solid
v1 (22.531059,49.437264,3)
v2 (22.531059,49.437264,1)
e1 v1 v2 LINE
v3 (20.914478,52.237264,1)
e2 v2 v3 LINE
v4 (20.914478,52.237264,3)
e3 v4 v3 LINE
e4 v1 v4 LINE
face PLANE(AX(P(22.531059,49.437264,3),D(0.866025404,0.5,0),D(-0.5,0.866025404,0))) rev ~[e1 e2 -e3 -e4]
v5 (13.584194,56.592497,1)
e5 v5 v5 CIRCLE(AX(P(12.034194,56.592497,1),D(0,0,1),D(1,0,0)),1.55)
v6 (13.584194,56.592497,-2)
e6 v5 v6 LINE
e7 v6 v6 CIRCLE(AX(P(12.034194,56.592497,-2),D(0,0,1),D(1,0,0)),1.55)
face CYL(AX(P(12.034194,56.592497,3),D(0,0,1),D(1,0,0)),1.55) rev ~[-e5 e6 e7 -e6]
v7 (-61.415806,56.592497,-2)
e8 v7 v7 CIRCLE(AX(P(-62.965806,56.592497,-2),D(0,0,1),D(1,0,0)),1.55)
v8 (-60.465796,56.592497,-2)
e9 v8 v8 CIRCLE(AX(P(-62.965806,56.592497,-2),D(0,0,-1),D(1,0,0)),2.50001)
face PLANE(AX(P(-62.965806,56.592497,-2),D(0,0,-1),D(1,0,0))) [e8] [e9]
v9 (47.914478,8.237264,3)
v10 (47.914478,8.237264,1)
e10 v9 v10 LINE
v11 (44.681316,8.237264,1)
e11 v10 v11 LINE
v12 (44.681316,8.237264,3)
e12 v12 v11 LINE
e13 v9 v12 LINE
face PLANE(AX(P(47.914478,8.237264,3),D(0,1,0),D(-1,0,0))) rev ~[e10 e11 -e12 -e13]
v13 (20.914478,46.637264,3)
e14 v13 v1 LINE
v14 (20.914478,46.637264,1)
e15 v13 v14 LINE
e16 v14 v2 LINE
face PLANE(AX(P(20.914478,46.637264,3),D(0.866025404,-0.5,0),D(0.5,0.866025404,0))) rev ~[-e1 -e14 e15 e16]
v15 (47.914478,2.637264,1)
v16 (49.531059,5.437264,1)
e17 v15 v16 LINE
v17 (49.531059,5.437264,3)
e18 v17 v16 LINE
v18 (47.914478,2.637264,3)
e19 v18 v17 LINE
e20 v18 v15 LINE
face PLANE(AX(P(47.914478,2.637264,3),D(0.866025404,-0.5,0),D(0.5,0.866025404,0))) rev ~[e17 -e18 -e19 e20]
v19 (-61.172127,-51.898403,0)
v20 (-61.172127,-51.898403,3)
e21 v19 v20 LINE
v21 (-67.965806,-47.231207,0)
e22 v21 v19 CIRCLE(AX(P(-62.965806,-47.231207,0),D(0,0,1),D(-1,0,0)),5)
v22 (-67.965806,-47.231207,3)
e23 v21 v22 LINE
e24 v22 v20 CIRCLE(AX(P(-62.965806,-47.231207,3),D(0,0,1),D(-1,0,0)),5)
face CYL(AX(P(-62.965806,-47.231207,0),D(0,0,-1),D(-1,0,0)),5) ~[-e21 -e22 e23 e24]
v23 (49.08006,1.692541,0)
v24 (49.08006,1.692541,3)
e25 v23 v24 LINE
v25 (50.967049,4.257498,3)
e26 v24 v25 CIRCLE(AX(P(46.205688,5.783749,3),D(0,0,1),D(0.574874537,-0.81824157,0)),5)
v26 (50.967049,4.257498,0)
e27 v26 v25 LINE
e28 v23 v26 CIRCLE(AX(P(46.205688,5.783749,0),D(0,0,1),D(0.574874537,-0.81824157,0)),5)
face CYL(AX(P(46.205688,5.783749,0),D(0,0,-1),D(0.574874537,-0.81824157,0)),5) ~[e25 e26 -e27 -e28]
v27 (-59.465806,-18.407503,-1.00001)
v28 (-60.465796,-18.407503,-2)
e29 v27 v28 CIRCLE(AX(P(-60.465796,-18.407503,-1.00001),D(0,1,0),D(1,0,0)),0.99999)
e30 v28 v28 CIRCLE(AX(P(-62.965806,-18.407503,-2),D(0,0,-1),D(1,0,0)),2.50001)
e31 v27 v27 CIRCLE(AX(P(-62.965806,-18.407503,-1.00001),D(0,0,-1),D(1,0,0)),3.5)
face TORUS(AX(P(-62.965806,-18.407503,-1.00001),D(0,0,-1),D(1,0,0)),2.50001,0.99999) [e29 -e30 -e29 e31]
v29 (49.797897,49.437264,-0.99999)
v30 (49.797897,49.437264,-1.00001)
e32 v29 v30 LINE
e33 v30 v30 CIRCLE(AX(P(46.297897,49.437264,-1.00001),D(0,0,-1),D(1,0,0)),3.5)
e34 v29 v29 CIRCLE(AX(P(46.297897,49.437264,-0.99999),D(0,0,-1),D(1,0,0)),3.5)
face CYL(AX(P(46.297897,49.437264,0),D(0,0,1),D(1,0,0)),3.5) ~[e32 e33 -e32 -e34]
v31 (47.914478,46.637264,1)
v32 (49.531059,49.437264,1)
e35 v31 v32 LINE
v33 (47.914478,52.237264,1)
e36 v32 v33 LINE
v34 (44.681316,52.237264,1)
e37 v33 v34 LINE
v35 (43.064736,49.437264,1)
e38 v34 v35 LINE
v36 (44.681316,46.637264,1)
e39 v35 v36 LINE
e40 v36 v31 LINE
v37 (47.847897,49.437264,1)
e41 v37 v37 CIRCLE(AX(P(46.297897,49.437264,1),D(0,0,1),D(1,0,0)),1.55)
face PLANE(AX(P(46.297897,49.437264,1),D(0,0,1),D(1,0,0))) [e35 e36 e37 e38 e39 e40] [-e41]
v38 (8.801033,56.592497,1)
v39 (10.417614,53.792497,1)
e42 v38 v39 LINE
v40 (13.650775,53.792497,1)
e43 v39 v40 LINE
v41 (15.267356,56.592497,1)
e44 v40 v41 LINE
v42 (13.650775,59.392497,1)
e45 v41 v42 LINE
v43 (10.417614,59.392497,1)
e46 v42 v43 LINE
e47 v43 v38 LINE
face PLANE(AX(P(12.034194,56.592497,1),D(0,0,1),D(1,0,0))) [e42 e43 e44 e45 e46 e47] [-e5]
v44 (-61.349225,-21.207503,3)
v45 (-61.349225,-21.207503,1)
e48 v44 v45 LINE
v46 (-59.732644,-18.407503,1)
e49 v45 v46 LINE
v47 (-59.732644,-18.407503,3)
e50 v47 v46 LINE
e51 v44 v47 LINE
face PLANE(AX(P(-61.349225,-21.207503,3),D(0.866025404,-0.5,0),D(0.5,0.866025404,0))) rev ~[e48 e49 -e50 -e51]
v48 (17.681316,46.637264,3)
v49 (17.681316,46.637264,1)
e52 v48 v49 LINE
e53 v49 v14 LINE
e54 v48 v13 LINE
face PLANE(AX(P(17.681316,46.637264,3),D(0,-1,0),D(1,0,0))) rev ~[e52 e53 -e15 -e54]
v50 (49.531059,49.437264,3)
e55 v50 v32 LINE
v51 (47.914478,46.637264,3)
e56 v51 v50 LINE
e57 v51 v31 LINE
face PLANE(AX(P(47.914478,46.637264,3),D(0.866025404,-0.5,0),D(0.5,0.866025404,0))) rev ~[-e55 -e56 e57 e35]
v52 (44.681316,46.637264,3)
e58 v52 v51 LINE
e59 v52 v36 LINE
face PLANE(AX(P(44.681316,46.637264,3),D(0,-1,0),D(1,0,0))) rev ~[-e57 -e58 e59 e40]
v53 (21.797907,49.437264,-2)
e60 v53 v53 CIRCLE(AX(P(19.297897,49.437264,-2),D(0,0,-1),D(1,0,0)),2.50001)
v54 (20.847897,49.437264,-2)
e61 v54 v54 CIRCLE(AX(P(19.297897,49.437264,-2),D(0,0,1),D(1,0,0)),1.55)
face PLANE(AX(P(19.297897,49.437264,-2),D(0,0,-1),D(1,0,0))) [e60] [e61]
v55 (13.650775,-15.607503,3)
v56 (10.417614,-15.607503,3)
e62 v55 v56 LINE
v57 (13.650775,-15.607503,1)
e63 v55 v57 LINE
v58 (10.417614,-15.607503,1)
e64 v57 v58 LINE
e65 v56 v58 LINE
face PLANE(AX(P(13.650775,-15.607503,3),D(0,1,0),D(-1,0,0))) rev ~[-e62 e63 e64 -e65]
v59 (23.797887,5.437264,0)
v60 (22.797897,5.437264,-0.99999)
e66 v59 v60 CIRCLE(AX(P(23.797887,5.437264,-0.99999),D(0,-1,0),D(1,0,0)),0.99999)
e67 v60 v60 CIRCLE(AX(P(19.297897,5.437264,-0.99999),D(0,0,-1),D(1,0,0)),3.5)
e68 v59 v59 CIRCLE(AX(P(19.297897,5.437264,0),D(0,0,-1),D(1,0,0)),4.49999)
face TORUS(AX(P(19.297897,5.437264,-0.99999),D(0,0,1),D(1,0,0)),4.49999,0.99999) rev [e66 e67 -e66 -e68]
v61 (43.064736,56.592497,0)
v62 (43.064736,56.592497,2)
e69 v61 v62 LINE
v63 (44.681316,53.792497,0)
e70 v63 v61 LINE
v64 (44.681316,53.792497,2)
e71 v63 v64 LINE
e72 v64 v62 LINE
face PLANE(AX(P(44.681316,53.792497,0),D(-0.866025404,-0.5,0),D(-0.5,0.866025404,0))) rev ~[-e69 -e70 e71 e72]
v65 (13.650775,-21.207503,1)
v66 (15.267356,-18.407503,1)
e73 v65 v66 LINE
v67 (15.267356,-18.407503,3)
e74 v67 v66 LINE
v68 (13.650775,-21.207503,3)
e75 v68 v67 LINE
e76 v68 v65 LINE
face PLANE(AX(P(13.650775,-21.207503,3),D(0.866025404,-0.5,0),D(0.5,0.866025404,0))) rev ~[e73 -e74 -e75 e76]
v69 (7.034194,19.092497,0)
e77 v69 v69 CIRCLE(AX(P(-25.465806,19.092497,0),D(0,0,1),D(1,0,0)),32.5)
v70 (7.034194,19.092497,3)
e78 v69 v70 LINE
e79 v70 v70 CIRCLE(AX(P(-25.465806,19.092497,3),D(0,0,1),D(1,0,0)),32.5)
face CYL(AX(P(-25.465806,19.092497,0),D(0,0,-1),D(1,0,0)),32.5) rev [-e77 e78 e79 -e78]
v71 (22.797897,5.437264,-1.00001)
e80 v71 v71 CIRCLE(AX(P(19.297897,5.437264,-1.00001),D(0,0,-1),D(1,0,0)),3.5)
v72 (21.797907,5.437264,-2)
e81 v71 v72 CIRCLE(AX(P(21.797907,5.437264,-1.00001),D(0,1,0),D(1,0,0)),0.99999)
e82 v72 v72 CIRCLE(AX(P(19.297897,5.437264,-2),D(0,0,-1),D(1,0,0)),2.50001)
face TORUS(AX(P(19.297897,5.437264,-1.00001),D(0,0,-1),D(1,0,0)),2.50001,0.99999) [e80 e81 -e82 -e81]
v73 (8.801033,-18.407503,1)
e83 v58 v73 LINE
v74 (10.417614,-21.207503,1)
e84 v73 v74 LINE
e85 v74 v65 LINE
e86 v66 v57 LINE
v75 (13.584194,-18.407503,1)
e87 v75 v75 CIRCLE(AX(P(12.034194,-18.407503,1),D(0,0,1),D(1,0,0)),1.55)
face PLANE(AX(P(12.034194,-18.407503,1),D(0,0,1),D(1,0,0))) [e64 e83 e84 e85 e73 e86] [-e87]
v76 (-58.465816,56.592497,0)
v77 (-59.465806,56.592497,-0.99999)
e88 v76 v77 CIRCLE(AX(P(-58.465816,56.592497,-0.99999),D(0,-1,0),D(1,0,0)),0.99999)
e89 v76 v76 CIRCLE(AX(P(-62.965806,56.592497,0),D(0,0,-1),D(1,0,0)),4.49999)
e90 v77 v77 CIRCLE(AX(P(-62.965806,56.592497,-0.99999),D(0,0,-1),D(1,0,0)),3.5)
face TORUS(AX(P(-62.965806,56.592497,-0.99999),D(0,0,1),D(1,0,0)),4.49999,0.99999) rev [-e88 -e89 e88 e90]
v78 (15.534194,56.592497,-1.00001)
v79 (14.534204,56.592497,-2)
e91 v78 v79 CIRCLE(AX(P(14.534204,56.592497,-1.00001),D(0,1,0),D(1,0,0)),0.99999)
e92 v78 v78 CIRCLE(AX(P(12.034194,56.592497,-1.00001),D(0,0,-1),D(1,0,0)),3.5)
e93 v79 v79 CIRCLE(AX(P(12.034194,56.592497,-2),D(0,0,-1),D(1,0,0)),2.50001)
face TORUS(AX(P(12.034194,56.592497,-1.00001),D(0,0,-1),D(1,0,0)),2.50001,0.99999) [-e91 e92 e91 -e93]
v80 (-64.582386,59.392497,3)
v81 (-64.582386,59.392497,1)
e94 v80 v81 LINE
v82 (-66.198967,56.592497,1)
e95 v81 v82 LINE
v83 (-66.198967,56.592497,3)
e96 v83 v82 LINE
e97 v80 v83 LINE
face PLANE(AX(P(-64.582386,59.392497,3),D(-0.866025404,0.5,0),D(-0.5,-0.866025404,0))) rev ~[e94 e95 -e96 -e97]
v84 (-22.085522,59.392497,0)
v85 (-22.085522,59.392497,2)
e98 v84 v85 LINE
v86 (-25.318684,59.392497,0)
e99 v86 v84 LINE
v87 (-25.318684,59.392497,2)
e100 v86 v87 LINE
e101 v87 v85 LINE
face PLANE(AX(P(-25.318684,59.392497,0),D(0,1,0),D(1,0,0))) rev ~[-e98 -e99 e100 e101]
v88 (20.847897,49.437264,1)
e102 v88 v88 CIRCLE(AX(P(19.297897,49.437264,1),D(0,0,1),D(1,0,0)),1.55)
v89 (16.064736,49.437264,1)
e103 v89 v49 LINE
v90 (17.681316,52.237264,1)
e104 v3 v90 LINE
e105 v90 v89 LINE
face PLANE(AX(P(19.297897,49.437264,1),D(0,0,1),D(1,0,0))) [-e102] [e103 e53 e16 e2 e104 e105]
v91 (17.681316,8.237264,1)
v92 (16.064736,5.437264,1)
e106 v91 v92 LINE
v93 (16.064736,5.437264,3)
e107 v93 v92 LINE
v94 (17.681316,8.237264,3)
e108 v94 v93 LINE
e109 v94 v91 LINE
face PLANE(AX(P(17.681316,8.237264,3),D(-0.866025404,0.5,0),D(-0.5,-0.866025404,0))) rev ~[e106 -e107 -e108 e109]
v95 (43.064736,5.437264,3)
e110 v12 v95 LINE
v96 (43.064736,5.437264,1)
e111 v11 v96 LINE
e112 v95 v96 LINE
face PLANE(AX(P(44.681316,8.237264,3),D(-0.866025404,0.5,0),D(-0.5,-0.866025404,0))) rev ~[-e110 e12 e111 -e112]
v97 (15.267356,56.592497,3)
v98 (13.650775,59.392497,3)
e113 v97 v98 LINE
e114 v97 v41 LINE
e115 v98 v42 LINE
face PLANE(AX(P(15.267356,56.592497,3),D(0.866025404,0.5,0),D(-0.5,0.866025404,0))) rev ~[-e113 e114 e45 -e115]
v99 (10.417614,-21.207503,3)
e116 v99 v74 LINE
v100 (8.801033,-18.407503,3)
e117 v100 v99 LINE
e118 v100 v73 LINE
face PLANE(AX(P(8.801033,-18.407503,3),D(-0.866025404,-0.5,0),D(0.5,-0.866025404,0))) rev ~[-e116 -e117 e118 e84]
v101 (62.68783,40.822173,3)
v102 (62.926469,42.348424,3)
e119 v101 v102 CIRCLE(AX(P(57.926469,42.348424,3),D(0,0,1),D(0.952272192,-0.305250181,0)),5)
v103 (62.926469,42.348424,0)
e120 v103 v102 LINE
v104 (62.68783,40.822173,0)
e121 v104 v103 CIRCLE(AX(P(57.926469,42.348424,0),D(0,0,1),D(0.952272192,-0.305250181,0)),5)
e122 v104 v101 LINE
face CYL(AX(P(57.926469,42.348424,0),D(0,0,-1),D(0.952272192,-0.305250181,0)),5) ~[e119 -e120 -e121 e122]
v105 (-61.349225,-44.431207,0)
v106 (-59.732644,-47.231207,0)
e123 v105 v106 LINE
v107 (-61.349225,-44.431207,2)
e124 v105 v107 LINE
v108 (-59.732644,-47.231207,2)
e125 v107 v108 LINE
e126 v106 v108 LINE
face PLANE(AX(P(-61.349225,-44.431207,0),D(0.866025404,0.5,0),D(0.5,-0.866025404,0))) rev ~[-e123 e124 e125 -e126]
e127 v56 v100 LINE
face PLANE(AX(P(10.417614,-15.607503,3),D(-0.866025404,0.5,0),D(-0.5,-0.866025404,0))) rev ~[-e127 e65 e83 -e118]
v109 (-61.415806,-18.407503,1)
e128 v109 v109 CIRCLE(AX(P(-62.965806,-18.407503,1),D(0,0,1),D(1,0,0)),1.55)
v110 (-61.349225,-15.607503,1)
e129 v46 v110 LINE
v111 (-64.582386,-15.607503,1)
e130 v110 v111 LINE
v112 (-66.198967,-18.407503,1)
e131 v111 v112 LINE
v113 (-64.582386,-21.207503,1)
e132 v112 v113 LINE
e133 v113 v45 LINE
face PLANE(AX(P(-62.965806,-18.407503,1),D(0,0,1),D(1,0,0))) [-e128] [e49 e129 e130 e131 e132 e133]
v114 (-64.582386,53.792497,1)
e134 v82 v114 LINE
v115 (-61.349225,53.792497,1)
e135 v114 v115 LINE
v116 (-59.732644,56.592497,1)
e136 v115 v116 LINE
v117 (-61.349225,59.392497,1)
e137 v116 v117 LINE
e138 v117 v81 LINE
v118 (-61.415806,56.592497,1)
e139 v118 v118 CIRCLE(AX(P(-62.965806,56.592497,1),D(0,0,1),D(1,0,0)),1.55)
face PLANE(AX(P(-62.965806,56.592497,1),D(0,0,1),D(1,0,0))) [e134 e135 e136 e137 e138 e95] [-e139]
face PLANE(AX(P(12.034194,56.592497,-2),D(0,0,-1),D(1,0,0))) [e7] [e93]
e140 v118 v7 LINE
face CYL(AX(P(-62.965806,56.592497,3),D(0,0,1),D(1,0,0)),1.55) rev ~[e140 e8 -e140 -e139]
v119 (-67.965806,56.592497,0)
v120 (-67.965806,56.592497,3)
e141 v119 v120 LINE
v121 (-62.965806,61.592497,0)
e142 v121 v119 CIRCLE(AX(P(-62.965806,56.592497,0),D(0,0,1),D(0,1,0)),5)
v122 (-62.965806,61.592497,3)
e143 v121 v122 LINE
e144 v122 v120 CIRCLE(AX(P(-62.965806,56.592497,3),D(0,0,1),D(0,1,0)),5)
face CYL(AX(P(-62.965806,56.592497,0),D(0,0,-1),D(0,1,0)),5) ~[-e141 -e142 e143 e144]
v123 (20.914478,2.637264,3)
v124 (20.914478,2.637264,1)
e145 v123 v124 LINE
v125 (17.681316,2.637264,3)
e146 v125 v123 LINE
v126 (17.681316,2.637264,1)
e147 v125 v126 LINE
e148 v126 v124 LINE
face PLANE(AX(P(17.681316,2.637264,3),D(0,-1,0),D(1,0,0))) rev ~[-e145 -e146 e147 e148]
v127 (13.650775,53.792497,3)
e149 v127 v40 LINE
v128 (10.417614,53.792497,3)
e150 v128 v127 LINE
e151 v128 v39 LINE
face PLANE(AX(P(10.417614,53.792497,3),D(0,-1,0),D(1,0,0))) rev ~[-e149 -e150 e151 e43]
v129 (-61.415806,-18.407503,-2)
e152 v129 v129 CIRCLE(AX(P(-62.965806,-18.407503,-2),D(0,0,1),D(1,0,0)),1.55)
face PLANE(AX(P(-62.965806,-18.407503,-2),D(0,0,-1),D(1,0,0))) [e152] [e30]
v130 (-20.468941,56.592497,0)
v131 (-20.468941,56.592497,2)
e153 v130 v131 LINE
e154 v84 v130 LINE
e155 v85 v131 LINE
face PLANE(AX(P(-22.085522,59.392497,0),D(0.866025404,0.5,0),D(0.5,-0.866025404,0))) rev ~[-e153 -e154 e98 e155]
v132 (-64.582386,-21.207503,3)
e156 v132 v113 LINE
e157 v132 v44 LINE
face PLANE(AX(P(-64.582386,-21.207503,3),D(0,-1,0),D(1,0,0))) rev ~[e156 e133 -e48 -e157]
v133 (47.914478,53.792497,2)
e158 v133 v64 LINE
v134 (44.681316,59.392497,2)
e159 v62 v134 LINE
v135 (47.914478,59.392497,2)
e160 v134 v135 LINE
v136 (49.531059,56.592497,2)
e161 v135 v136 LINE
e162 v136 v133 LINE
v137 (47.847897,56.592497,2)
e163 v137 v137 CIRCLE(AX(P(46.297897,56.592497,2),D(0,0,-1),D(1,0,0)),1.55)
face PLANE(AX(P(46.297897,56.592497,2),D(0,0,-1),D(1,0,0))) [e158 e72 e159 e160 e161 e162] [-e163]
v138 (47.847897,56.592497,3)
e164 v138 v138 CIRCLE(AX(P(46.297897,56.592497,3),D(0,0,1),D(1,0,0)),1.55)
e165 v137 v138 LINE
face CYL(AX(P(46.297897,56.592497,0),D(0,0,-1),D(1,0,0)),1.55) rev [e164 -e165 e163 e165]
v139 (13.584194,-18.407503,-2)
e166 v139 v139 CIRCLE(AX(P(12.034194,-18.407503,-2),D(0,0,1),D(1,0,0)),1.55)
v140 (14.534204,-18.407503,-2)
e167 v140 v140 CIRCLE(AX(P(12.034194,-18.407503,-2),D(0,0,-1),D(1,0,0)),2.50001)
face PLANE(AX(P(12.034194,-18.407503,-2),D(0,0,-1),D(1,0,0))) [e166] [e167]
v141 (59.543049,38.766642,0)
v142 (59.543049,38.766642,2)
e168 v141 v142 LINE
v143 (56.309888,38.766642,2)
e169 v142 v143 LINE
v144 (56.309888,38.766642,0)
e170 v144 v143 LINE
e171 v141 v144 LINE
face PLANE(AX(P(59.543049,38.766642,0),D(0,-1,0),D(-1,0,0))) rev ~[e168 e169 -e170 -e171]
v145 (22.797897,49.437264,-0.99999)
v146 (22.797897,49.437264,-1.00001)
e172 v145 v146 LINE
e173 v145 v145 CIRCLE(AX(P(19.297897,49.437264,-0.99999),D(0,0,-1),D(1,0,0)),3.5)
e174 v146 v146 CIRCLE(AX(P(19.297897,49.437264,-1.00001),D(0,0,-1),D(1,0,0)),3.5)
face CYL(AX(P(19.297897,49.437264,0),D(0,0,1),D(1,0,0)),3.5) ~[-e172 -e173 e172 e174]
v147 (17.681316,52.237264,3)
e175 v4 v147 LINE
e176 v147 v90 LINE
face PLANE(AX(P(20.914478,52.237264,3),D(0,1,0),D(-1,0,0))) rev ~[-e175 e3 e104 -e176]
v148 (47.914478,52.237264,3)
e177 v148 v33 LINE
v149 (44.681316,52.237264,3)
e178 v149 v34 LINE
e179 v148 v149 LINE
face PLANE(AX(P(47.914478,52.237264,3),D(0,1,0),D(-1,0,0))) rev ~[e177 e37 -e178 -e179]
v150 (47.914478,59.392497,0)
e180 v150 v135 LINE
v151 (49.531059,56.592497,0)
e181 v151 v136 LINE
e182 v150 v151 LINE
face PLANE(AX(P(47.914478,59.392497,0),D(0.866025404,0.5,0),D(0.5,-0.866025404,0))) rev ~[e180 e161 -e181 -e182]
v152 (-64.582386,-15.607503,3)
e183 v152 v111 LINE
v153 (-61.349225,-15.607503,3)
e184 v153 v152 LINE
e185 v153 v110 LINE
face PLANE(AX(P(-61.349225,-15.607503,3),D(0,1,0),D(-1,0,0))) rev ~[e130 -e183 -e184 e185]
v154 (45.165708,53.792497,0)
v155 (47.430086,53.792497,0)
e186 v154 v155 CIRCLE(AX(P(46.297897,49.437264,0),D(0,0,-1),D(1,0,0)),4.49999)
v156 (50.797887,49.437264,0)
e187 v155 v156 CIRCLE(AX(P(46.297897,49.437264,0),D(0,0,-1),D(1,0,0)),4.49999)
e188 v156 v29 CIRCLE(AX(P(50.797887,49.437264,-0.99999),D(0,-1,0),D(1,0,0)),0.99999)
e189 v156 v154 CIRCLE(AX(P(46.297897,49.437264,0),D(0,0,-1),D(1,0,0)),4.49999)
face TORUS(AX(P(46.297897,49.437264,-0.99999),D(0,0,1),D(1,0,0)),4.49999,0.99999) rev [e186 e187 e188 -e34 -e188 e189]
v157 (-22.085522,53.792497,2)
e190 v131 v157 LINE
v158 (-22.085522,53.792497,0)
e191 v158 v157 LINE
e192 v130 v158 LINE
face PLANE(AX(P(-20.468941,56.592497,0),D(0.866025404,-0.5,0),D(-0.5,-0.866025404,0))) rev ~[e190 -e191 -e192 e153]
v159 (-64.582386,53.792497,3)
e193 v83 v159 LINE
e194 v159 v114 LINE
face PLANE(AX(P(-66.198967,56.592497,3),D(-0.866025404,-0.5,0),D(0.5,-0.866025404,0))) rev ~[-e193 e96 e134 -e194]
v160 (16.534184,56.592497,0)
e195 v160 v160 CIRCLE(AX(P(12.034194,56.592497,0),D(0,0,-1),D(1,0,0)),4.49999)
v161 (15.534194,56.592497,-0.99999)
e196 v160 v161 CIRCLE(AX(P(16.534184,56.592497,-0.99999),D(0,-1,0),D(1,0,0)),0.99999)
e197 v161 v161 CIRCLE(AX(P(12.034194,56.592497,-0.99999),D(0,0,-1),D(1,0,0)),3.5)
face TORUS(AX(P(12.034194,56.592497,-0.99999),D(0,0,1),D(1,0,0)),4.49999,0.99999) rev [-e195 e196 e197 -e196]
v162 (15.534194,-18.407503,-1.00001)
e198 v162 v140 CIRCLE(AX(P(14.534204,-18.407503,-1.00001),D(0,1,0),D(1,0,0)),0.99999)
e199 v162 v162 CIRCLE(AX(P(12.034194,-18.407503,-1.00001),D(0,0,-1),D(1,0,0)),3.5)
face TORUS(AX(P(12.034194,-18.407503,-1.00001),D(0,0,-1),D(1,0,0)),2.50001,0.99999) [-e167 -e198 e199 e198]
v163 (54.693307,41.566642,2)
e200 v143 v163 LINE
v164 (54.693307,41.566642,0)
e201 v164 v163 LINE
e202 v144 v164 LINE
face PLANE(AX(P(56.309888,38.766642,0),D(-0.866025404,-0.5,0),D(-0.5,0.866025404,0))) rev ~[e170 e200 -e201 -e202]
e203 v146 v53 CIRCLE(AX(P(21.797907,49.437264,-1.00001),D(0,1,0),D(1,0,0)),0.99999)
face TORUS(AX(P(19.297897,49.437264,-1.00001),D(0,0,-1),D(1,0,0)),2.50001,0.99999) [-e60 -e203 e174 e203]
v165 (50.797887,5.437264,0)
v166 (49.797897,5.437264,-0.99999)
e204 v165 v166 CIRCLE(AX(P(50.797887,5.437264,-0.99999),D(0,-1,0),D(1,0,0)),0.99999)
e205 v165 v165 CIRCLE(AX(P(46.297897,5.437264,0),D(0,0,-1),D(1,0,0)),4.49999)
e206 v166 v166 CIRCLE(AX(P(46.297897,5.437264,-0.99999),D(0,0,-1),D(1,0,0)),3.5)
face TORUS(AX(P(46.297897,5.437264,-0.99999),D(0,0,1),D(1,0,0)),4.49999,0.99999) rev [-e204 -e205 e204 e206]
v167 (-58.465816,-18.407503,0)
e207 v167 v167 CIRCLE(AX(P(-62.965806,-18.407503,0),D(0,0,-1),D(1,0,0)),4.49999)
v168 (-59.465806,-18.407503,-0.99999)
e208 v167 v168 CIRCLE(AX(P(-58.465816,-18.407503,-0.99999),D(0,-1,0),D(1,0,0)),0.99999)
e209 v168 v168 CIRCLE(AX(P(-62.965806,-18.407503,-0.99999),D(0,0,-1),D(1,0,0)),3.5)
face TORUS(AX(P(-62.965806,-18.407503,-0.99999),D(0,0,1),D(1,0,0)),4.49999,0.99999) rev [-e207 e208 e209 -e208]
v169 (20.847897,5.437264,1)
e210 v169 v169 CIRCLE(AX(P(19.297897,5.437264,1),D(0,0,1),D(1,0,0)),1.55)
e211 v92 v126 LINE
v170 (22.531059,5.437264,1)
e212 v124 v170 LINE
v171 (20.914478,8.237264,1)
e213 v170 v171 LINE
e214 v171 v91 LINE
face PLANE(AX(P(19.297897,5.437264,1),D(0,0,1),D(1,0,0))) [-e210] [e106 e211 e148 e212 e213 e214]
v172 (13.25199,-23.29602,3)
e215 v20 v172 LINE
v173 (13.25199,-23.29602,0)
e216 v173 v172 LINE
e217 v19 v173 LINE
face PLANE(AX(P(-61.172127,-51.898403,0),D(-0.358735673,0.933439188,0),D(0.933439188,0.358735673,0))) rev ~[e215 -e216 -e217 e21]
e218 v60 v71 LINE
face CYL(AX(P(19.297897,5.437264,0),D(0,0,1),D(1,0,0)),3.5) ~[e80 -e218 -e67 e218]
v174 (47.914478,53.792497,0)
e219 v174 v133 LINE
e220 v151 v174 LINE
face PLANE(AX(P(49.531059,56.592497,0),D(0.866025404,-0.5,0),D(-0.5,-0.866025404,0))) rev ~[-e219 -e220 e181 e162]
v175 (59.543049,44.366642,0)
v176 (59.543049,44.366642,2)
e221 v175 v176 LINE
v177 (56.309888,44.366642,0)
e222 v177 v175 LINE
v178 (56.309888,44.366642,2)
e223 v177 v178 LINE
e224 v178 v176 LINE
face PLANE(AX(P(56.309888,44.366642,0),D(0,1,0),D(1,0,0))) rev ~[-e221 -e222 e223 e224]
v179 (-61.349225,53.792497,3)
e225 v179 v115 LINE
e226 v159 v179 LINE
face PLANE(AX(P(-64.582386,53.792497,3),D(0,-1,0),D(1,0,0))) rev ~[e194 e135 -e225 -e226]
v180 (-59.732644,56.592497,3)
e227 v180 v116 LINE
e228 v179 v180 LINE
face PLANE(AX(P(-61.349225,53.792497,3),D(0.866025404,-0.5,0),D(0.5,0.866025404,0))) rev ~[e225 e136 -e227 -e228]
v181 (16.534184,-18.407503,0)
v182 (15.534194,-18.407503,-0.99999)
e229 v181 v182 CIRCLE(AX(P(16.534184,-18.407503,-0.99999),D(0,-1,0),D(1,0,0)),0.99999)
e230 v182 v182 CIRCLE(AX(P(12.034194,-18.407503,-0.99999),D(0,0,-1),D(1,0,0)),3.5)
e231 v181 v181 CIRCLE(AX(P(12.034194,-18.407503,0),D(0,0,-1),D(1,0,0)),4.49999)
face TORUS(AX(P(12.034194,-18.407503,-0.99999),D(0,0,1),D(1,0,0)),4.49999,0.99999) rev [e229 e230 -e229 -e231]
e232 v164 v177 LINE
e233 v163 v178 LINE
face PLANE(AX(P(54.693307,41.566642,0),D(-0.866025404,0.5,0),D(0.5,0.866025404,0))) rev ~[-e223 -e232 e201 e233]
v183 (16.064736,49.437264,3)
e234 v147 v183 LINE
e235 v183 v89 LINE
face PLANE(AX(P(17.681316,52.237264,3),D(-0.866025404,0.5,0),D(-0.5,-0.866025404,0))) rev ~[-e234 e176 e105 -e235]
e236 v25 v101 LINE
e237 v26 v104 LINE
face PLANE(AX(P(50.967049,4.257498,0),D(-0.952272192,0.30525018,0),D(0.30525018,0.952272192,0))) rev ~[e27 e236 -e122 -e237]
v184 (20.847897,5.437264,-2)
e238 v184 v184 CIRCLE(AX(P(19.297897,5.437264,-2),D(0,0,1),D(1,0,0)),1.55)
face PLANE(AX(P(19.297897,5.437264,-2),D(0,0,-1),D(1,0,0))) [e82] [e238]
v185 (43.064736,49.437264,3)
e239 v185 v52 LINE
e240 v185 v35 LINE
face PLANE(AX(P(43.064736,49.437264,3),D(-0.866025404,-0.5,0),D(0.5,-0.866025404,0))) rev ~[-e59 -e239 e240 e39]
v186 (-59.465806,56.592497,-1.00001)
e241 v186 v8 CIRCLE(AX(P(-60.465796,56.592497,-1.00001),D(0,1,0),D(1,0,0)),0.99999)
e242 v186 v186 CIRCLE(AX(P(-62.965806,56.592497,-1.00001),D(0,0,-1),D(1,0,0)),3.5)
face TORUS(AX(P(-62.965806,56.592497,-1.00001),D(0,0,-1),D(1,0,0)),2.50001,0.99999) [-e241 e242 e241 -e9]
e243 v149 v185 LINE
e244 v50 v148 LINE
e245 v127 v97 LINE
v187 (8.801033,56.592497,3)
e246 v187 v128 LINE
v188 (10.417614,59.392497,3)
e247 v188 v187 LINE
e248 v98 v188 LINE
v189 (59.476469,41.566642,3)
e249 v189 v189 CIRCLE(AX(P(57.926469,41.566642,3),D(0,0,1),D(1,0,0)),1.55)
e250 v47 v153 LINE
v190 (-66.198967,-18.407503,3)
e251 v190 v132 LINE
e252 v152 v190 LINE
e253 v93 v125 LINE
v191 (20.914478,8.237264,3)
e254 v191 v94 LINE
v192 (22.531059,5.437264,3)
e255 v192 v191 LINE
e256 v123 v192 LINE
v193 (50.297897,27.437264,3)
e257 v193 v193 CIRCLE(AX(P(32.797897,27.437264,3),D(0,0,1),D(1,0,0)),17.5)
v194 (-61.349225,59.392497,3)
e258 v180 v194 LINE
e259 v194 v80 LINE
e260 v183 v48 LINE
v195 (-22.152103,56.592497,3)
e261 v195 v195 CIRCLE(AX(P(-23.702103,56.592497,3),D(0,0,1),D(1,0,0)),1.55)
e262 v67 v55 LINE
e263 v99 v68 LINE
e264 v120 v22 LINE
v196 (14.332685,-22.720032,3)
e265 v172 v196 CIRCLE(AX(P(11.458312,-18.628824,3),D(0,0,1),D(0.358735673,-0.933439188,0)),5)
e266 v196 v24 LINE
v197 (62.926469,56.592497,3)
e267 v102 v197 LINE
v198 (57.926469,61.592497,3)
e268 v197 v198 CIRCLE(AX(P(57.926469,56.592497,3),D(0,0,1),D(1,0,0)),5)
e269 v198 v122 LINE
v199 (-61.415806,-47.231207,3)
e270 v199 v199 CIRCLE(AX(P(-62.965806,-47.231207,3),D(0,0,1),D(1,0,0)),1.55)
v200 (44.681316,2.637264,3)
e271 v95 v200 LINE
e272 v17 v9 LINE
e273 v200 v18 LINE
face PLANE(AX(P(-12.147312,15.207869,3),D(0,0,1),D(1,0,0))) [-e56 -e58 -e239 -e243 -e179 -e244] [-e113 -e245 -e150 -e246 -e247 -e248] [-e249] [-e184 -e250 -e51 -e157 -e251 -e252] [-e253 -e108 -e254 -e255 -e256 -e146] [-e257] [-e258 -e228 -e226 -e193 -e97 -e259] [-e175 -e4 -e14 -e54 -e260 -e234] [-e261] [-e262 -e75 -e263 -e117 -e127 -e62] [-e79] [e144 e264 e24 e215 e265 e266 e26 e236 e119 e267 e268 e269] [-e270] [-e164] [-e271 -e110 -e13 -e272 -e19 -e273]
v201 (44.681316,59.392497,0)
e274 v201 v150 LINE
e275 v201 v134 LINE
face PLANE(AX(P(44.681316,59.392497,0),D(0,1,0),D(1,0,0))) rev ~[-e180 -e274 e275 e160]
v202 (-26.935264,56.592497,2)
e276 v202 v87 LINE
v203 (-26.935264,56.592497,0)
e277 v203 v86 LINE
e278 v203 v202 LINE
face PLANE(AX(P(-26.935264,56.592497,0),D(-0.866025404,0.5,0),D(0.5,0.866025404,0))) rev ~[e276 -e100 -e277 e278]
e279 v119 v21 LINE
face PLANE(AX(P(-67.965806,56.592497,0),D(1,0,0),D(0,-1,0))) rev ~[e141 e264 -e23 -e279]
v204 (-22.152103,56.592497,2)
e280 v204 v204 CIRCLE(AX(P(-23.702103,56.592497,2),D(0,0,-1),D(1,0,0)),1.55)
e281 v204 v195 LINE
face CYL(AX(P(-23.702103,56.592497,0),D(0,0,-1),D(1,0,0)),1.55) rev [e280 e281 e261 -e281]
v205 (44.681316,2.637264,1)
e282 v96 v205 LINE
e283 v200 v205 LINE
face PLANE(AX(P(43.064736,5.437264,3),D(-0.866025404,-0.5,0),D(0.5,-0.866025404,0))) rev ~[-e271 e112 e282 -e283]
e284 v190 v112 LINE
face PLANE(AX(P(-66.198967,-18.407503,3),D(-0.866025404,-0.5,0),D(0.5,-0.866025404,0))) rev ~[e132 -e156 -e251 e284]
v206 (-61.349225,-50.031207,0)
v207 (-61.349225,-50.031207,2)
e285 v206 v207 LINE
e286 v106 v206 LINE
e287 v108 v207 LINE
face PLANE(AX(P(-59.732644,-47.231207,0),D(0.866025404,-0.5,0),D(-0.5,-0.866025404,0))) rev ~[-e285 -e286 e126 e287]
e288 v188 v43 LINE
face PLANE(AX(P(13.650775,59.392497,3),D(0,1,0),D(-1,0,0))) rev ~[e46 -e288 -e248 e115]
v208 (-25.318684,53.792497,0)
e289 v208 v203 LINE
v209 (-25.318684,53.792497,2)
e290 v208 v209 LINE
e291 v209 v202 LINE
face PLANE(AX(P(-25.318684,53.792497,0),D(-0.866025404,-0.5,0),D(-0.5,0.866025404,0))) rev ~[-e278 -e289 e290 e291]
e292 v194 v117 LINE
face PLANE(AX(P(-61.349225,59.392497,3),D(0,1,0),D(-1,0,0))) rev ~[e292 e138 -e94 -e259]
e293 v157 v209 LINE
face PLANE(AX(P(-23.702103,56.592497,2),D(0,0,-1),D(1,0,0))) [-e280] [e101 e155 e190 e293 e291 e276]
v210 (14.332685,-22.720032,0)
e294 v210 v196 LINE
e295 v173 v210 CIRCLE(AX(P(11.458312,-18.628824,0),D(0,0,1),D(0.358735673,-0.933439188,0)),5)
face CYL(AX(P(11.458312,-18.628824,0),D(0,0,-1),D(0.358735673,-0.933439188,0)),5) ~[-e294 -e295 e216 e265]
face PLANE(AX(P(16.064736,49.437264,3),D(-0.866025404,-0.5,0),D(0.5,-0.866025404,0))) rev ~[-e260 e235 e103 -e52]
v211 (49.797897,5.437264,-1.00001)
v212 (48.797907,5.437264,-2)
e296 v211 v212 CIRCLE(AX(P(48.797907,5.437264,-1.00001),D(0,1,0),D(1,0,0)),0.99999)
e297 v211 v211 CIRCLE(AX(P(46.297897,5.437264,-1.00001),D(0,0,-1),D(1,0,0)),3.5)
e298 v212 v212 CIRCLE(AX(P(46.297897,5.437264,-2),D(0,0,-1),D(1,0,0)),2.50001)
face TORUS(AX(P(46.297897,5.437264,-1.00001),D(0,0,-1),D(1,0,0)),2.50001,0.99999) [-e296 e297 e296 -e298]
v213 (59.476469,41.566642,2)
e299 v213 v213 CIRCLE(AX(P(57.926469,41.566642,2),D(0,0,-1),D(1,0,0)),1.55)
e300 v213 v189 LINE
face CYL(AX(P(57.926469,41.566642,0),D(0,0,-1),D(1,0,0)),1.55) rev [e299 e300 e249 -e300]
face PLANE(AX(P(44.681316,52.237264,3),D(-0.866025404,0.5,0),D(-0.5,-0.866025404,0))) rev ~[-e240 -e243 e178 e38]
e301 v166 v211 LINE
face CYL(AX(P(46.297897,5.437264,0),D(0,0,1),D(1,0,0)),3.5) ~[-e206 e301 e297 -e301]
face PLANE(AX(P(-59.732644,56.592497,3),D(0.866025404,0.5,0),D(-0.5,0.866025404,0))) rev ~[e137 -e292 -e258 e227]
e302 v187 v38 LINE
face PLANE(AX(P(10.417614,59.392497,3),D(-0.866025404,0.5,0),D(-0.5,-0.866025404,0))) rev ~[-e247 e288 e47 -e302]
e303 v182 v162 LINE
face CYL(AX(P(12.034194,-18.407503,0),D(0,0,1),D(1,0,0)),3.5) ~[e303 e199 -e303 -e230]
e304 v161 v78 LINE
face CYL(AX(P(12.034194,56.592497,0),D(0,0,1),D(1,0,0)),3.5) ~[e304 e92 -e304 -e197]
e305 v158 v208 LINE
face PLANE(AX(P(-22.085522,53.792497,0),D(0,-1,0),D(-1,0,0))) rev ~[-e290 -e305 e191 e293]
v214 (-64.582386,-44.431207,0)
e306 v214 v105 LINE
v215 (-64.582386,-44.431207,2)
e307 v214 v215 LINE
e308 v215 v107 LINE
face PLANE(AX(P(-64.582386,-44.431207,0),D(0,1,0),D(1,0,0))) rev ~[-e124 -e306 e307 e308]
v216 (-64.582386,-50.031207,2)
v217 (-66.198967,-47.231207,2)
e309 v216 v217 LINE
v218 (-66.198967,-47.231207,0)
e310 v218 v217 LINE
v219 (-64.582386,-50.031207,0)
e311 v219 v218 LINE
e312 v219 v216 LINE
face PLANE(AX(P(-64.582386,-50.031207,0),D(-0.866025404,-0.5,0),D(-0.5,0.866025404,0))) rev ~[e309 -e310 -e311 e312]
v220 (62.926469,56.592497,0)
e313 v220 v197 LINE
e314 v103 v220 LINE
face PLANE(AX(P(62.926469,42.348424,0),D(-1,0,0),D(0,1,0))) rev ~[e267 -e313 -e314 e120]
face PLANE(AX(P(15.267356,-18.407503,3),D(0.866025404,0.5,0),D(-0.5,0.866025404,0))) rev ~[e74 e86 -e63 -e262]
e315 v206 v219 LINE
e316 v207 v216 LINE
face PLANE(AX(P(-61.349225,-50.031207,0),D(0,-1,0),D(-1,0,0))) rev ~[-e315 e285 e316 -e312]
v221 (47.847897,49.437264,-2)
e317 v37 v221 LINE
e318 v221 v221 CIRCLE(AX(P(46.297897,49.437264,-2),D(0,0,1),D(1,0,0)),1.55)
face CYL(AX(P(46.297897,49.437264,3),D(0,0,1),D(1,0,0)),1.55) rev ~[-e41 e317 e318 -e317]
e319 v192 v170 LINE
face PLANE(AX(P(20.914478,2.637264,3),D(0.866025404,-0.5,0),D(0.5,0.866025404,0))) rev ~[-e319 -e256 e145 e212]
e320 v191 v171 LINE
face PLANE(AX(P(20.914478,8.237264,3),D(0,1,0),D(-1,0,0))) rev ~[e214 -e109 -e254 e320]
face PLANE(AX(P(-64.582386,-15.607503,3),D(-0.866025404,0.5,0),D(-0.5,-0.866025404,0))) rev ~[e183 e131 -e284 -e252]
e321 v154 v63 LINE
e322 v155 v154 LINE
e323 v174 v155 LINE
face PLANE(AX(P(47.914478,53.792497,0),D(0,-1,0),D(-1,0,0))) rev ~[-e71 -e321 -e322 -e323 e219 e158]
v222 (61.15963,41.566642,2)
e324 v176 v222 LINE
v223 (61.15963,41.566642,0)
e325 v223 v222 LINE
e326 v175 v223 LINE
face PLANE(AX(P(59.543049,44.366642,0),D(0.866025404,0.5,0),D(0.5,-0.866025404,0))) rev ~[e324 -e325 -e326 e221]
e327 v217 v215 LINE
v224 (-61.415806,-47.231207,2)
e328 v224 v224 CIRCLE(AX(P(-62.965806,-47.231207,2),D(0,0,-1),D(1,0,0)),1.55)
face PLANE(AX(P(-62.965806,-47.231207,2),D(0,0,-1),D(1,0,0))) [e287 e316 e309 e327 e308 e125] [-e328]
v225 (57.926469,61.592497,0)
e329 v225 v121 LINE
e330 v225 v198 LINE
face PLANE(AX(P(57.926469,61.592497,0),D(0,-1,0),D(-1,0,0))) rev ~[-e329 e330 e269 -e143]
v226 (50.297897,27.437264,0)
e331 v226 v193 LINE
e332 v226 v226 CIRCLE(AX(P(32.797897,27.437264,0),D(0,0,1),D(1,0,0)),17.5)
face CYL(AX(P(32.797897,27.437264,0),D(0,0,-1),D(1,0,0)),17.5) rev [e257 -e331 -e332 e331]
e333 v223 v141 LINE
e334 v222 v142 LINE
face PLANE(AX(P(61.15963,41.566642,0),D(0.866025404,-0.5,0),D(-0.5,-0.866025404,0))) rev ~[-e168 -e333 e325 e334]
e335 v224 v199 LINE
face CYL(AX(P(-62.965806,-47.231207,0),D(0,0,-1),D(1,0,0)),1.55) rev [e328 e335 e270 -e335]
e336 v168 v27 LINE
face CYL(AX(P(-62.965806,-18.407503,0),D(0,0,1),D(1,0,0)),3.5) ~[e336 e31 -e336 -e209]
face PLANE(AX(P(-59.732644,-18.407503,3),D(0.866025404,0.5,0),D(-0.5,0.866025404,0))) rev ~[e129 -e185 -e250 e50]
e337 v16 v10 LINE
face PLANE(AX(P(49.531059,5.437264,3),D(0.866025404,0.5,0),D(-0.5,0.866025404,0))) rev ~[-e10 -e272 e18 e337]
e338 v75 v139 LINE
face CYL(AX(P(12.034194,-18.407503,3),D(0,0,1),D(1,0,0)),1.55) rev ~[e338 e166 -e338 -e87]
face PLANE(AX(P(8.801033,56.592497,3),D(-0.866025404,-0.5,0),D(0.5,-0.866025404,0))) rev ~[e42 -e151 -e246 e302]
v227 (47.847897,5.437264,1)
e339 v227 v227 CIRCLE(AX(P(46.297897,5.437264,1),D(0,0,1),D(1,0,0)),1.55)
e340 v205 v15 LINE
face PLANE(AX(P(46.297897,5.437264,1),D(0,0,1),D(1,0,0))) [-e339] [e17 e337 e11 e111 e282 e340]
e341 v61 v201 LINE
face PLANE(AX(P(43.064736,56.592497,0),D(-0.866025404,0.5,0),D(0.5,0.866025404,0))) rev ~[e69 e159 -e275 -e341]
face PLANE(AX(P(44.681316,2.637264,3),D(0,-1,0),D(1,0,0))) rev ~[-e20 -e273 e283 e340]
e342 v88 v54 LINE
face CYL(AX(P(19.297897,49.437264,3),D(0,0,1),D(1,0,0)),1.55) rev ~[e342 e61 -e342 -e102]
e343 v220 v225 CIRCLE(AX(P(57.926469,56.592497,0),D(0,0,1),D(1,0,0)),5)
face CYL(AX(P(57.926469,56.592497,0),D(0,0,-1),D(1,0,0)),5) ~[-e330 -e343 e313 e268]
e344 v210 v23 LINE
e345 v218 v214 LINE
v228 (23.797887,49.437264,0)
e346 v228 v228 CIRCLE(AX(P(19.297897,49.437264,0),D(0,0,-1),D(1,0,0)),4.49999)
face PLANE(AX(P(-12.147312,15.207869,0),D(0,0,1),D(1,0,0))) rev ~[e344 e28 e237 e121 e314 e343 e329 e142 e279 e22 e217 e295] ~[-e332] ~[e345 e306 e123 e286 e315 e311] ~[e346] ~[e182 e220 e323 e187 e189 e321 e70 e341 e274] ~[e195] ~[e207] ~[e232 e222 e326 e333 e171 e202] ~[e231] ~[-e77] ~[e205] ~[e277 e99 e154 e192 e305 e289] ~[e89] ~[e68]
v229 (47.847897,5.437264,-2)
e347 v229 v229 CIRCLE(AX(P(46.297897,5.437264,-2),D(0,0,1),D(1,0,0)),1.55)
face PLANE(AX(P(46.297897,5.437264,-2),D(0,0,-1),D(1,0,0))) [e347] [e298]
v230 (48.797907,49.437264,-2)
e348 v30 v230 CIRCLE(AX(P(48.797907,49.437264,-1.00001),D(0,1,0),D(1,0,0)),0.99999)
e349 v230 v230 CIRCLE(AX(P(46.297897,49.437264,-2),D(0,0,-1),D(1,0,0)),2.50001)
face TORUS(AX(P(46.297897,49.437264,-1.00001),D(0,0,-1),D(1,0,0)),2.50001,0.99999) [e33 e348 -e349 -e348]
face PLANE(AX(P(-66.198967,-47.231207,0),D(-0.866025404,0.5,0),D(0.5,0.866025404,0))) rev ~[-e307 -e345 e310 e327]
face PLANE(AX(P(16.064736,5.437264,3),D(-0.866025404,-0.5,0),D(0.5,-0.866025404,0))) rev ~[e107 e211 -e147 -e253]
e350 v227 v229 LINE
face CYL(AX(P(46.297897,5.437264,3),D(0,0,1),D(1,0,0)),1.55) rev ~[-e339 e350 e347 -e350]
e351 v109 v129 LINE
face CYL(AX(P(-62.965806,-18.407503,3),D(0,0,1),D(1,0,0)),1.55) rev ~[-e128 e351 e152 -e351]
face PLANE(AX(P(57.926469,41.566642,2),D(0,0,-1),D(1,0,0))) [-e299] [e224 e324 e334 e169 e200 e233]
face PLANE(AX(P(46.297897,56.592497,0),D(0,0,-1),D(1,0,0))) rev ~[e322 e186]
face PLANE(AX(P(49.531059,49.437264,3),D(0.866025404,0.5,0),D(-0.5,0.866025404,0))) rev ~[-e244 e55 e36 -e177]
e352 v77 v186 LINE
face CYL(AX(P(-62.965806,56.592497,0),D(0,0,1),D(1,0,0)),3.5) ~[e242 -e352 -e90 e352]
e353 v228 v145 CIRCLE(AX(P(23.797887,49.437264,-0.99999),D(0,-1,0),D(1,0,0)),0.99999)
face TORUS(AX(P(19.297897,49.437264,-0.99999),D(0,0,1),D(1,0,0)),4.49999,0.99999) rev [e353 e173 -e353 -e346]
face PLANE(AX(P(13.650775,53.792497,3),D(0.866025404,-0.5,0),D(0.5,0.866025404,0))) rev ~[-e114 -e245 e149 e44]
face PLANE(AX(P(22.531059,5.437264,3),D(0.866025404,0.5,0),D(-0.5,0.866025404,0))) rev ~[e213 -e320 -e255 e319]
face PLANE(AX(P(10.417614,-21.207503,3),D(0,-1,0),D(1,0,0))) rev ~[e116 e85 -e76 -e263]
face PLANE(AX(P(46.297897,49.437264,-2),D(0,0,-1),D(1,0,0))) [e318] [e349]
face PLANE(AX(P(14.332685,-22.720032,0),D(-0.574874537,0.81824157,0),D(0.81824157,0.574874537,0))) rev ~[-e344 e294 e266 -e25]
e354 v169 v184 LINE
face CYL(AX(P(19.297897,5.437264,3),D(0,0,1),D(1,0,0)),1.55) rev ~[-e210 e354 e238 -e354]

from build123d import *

# Parameters (mm, degrees)
F0_R      = 1.55
F0_R_2    = 32.5
F0_R_3    = 17.5
F1_DEPTH  = 3
F2_R      = 3.5
F3_DEPTH  = 2
F4_R      = 0.99999
F6_DEPTH  = 2
F7_R      = 1.55
F8_DEPTH  = 25
F10_DEPTH = 2


# Not quite as in the source:
# - a fillet or chamfer is up to 0.001 mm smaller than in the source, because OpenCascade refuses the exact size


with BuildPart() as f1:
    # F0 (on Top) → F1 (new body)
    with BuildSketch(Plane.XY):
        with BuildLine():
            Line((57.9264685896, 61.5924972273), (-62.9658055305, 61.5924972273))
            ThreePointArc((-62.9658055305, 61.5924972273), (-66.5013394365, 60.1280311332), (-67.9658055305, 56.5924972273))
            Line((-67.9658055305, 56.5924972273), (-67.9658055305, -47.2312074405))
            ThreePointArc((-67.9658055305, -47.2312074405), (-65.7970250714, -51.3523960933), (-61.1721271659, -51.8984033786))
            Line((-61.1721271659, -51.8984033786), (13.2519902581, -23.2960196347))
            ThreePointArc((13.2519902581, -23.2960196347), (13.8100380076, -23.0412362209), (14.332684577, -22.7200315472))
            Line((14.332684577, -22.7200315472), (49.0800604394, 1.6925408888))
            ThreePointArc((49.0800604394, 1.6925408888), (50.2332004004, 2.8207870625), (50.967048715, 4.2574978369))
            Line((50.967048715, 4.2574978369), (62.6878295487, 40.8221728745))
            ThreePointArc((62.6878295487, 40.8221728745), (62.8664485894, 41.5760264684), (62.9264685896, 42.3484237769))
            Line((62.9264685896, 42.3484237769), (62.9264685896, 56.5924972273))
            ThreePointArc((62.9264685896, 56.5924972273), (61.4620024956, 60.1280311332), (57.9264685896, 61.5924972273))
        make_face()
        with Locations((-62.9658055305, -47.2312074405)):
            Circle(F0_R, mode=Mode.SUBTRACT)
        with Locations((-25.4658055305, 19.0924972273)):
            Circle(F0_R_2, mode=Mode.SUBTRACT)
        with Locations((-23.702102839, 56.5924972273)):
            Circle(F0_R, mode=Mode.SUBTRACT)
        with Locations((32.797897161, 27.4372637533)):
            Circle(F0_R_3, mode=Mode.SUBTRACT)
        with Locations((57.9264685896, 41.5666419594)):
            Circle(F0_R, mode=Mode.SUBTRACT)
        with Locations((46.297897161, 56.5924972273)):
            Circle(F0_R, mode=Mode.SUBTRACT)
    extrude(amount=F1_DEPTH)

    # F2 (on face) → F3 (join)
    with BuildSketch(Plane(origin=(0, 0, 0), x_dir=(1, 0, 0), z_dir=(0, 0, -1))):
        with Locations((-62.9658055305, -56.5924972273)):
            Circle(F2_R)
        with Locations((12.0341944695, -56.5924972273)):
            Circle(F2_R)
        with Locations((12.0341944695, 18.4075027727)):
            Circle(F2_R)
        with Locations((-62.9658055305, 18.4075027727)):
            Circle(F2_R)
        with Locations((19.297897161, -49.4372637533)):
            Circle(F2_R)
        with Locations((46.297897161, -49.4372637533)):
            Circle(F2_R)
        with Locations((46.297897161, -5.4372637533)):
            Circle(F2_R)
        with Locations((19.297897161, -5.4372637533)):
            Circle(F2_R)
    extrude(amount=F3_DEPTH)

    # F4 (radius 1 in the source; OpenCascade refuses exactly that, so slightly less here)
    f4_edges = [f1.edges().sort_by_distance(p)[0] for p in [
        (-59.465806, -18.407503, -1),
        (-66.465806, -18.407503, 0),
        (-66.465806, -18.407503, -2),
        (-59.465806, 56.592497, -1),
        (-66.465806, 56.592497, 0),
        (-66.465806, 56.592497, -2),
        (15.534194, -18.407503, -1),
        (8.534194, -18.407503, 0),
        (8.534194, -18.407503, -2),
        (22.797897, 5.437264, -1),
        (15.797897, 5.437264, 0),
        (15.797897, 5.437264, -2),
        (22.797897, 49.437264, -1),
        (15.797897, 49.437264, 0),
        (15.797897, 49.437264, -2),
        (15.534194, 56.592497, -1),
        (8.534194, 56.592497, 0),
        (8.534194, 56.592497, -2),
        (49.797897, 5.437264, -1),
        (42.797897, 5.437264, 0),
        (42.797897, 5.437264, -2),
        (49.797897, 49.437264, -1),
        (42.797897, 49.437264, 0),
        (42.797897, 49.437264, -2),
    ]]
    fillet(f4_edges, radius=F4_R)

    # F5 (on face) → F6 (cut)
    with BuildSketch(Plane.XY.offset(3)):
        Polygon((-64.5823862843, -21.2075027727), (-61.3492247768, -21.2075027727), (-59.7326440231, -18.4075027727), (-61.3492247768, -15.6075027727), (-64.5823862843, -15.6075027727), (-66.198967038, -18.4075027727), align=None)
        Polygon((10.4176137157, -21.2075027727), (13.6507752232, -21.2075027727), (15.2673559769, -18.4075027727), (13.6507752232, -15.6075027727), (10.4176137157, -15.6075027727), (8.801032962, -18.4075027727), align=None)
        Polygon((17.6813164073, 2.6372637533), (20.9144779148, 2.6372637533), (22.5310586685, 5.4372637533), (20.9144779148, 8.2372637533), (17.6813164073, 8.2372637533), (16.0647356536, 5.4372637533), align=None)
        Polygon((-64.5823862843, 53.7924972273), (-61.3492247768, 53.7924972273), (-59.7326440231, 56.5924972273), (-61.3492247768, 59.3924972273), (-64.5823862843, 59.3924972273), (-66.198967038, 56.5924972273), align=None)
        Polygon((10.4176137157, 53.7924972273), (13.6507752232, 53.7924972273), (15.2673559769, 56.5924972273), (13.6507752232, 59.3924972273), (10.4176137157, 59.3924972273), (8.801032962, 56.5924972273), align=None)
        Polygon((17.6813164073, 46.6372637533), (20.9144779148, 46.6372637533), (22.5310586685, 49.4372637533), (20.9144779148, 52.2372637533), (17.6813164073, 52.2372637533), (16.0647356536, 49.4372637533), align=None)
        Polygon((44.6813164073, 46.6372637533), (47.9144779148, 46.6372637533), (49.5310586685, 49.4372637533), (47.9144779148, 52.2372637533), (44.6813164073, 52.2372637533), (43.0647356536, 49.4372637533), align=None)
        Polygon((47.9144779148, 8.2372637533), (44.6813164073, 8.2372637533), (43.0647356536, 5.4372637533), (44.6813164073, 2.6372637533), (47.9144779148, 2.6372637533), (49.5310586685, 5.4372637533), align=None)
    extrude(amount=-F6_DEPTH, mode=Mode.SUBTRACT)

    # F7 (on face) → F8 (cut)
    with BuildSketch(Plane.XY.offset(3)):
        with Locations((-62.9658055305, 56.5924972273)):
            Circle(F7_R)
        with Locations((-62.9658055305, -18.4075027727)):
            Circle(F7_R)
        with Locations((19.297897161, 5.4372637533)):
            Circle(F7_R)
        with Locations((46.297897161, 5.4372637533)):
            Circle(F7_R)
        with Locations((46.297897161, 49.4372637533)):
            Circle(F7_R)
        with Locations((19.297897161, 49.4372637533)):
            Circle(F7_R)
        with Locations((12.0341944695, -18.4075027727)):
            Circle(F7_R)
        with Locations((12.0341944695, 56.5924972273)):
            Circle(F7_R)
    extrude(amount=-F8_DEPTH, mode=Mode.SUBTRACT)

    # F9 (on face) → F10 (cut)
    with BuildSketch(Plane(origin=(0, 0, 0), x_dir=(1, 0, 0), z_dir=(0, 0, -1))):
        Polygon((-64.5823862843, 44.4312074405), (-61.3492247768, 44.4312074405), (-59.7326440231, 47.2312074405), (-61.3492247768, 50.0312074405), (-64.5823862843, 50.0312074405), (-66.198967038, 47.2312074405), align=None)
        Polygon((-25.3186835927, -59.3924972273), (-22.0855220852, -59.3924972273), (-20.4689413315, -56.5924972273), (-22.0855220852, -53.7924972273), (-25.3186835927, -53.7924972273), (-26.9352643464, -56.5924972273), align=None)
        Polygon((44.6813164073, -59.3924972273), (47.9144779148, -59.3924972273), (49.5310586685, -56.5924972273), (47.9144779148, -53.7924972273), (44.6813164073, -53.7924972273), (43.0647356536, -56.5924972273), align=None)
        Polygon((56.3098878359, -44.3666419594), (59.5430493434, -44.3666419594), (61.1596300971, -41.5666419594), (59.5430493434, -38.7666419594), (56.3098878359, -38.7666419594), (54.6933070822, -41.5666419594), align=None)
    extrude(amount=-F10_DEPTH, mode=Mode.SUBTRACT)


solid = f1.part
